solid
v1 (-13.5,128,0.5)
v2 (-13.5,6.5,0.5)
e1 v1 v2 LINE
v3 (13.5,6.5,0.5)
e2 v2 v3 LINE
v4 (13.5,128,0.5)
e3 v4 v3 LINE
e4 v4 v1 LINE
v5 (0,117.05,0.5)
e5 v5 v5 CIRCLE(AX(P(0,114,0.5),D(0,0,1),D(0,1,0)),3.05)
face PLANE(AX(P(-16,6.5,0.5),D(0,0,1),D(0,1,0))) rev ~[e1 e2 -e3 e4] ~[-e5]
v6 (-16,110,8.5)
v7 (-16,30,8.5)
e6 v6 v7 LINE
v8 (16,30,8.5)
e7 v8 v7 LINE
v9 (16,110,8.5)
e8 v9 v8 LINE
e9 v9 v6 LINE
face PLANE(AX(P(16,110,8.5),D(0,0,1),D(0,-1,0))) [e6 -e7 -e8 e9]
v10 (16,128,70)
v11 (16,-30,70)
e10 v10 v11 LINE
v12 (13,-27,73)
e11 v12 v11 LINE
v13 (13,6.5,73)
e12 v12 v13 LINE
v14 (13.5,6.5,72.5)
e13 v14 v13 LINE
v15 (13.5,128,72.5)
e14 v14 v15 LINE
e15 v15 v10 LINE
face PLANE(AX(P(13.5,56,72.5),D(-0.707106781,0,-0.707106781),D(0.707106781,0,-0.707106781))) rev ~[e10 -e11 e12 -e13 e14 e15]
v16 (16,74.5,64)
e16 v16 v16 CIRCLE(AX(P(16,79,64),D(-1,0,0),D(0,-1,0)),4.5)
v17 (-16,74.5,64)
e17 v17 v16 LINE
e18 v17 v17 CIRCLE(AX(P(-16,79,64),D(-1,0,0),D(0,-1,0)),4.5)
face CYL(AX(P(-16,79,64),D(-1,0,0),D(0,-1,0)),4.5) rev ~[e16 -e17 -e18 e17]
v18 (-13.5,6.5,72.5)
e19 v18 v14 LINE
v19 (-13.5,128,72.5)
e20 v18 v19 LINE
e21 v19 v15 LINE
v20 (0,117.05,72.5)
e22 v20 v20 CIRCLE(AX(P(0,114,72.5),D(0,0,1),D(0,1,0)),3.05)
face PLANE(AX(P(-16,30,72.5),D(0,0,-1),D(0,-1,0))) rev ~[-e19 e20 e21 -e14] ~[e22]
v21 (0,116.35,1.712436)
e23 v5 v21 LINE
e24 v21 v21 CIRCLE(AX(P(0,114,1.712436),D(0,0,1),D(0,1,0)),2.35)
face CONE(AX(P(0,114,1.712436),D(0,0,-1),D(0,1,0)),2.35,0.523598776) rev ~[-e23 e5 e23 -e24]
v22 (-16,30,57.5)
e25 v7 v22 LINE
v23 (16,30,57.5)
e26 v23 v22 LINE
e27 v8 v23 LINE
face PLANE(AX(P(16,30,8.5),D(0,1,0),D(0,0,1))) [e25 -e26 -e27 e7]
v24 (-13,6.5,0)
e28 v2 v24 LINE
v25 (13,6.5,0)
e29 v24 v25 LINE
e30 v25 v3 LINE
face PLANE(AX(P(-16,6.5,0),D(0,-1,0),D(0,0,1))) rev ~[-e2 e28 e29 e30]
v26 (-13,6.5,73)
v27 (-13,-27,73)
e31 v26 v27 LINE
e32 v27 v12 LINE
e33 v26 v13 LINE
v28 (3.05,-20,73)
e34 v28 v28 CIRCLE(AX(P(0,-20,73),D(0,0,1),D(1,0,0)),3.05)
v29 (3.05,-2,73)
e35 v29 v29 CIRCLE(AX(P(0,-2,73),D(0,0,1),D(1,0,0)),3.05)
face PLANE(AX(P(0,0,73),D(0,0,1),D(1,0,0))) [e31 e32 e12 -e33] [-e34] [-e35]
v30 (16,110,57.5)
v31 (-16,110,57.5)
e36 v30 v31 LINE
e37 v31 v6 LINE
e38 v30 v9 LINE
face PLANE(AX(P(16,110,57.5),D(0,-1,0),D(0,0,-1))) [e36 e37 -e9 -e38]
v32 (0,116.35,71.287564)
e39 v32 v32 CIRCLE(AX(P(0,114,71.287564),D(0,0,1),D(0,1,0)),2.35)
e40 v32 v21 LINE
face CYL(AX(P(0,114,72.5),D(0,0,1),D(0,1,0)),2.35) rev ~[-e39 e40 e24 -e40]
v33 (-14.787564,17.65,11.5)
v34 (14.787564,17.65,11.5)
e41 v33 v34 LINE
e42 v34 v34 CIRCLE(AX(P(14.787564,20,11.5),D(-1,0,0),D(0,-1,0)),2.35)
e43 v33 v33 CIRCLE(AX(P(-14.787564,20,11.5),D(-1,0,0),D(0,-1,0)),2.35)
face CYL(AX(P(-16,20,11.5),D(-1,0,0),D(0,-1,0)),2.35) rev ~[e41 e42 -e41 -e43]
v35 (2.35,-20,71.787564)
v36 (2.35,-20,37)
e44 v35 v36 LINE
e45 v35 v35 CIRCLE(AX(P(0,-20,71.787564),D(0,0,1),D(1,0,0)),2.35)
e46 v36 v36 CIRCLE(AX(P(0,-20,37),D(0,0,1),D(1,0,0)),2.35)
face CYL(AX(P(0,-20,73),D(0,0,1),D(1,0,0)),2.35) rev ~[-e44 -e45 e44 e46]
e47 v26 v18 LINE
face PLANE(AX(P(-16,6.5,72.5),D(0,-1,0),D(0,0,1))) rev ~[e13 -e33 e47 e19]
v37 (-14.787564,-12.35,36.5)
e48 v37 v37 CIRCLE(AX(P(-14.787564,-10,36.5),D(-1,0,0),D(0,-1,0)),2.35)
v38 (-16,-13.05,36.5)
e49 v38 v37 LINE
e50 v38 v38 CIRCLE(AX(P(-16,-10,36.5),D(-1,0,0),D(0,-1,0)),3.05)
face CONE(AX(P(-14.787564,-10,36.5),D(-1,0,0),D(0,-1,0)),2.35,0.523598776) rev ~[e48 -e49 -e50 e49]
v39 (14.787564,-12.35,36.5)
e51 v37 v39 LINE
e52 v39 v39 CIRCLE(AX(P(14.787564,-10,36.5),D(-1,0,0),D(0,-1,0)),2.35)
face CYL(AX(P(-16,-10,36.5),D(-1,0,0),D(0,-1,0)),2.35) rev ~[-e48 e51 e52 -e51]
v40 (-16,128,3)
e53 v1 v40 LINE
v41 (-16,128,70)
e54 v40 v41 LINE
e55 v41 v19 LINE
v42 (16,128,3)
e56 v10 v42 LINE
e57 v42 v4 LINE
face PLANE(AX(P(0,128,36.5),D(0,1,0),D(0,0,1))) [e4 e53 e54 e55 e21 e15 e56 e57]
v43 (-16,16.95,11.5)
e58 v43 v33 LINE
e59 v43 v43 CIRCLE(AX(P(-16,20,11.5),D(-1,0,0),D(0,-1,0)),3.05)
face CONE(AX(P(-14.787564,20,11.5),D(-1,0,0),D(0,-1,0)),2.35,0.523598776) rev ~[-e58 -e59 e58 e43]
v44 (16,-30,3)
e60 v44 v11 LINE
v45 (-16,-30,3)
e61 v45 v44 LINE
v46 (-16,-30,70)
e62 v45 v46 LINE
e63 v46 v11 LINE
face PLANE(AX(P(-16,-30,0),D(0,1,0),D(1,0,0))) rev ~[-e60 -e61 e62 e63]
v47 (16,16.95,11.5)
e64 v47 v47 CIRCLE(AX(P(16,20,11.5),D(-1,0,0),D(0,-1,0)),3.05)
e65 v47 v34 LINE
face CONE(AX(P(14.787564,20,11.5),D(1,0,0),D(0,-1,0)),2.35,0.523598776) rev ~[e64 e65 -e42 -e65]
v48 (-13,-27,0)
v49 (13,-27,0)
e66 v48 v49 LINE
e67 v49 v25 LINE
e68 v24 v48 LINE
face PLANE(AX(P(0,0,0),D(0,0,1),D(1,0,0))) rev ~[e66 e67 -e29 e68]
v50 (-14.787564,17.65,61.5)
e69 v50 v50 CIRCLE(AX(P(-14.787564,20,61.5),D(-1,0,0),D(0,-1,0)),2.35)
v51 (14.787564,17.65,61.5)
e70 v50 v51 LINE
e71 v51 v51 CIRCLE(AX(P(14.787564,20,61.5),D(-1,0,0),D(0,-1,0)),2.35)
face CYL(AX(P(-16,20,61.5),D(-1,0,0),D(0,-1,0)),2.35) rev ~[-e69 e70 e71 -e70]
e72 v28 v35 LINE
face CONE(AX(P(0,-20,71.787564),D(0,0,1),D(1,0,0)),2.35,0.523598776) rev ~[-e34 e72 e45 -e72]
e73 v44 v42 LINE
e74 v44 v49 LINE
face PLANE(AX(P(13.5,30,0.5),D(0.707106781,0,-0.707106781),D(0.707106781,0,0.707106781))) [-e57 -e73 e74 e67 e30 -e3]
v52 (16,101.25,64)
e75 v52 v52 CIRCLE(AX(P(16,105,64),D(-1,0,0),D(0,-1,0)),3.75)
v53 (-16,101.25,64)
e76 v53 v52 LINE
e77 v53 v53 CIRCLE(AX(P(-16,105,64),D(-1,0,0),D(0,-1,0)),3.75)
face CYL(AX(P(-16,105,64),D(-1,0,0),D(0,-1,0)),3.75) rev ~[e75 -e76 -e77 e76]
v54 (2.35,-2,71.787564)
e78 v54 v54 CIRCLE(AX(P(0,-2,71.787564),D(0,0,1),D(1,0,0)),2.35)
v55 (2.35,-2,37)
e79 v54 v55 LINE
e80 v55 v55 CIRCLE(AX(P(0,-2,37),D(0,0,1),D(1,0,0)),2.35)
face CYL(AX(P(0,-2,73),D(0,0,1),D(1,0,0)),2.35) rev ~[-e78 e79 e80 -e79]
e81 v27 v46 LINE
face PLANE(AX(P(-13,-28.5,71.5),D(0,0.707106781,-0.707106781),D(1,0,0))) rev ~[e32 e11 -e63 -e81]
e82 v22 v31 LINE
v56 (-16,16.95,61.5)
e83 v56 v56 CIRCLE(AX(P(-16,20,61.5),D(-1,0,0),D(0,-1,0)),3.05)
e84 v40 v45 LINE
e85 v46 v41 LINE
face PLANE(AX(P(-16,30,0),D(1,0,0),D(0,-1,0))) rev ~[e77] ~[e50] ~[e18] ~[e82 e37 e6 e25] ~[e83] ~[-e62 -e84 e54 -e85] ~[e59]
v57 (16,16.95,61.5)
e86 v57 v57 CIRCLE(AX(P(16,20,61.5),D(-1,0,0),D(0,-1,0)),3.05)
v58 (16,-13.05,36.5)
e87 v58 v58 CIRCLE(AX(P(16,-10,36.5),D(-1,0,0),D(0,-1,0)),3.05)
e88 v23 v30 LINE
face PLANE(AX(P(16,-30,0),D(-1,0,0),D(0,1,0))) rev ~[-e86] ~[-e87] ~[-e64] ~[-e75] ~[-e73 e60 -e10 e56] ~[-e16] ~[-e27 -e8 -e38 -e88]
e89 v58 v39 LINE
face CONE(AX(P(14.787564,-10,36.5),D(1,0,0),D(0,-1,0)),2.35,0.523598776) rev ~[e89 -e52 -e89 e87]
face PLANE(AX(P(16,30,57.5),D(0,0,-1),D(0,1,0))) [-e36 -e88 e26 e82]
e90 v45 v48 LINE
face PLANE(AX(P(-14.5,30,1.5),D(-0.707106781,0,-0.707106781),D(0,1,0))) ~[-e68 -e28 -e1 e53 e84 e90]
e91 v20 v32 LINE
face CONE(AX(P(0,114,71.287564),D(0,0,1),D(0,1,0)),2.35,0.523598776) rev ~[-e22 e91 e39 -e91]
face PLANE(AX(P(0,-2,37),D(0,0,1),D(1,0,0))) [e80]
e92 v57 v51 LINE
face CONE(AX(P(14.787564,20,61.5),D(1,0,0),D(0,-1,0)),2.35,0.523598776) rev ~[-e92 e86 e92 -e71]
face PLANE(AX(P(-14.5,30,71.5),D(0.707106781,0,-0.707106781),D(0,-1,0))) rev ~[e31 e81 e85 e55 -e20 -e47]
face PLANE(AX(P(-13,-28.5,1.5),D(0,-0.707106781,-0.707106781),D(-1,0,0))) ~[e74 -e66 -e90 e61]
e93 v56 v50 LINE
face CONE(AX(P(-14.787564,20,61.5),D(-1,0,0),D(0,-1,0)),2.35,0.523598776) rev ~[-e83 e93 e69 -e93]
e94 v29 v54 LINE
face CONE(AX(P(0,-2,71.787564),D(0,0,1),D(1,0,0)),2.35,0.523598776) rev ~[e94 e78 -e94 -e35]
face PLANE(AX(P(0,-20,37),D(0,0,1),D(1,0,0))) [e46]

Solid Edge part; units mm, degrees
sketch "Sketch1" plane through (0, 0, 0) normal (0, 0, 1) x (1, 0, 0)
  line L0 (-16, -30) -> (16, -30)
  line L1 (16, -30) -> (16, 30)
  line L2 (16, 30) -> (-16, 30)
  line L3 (-16, 30) -> (-16, -30)
  dimension "D1" = 32
  dimension "D2" = 60
extrude "Protrusion1" add sketch "Sketch1" along normal blind 73
sketch "Sketch2" plane through (0, 0, 73) normal (0, 0, 1) x (1, 0, 0)
  circle A0 centre (0, -20) radius 2.35
  circle A1 centre (0, -2) radius 2.35
  dimension "D1" = 4.7
  dimension "D2" = 18
  dimension "D3" = 10
extrude "Extrusionsausschnitt_1" cut sketch "Sketch2" against normal blind 36
chamfer "Fase_3" distance 0.7 angle 60 2 edges at (-2.35, -2, 73) (-2.35, -20, 73) measured on face at (-10.9867, -19.4, 73)
chamfer "Fase_6" distance 3 angle 45 4 edges at (-16, 0, 73) (-16, 0, 0) (16, 0, 73) (16, 0, 0)
chamfer "Fase_7" distance 3 angle 45 2 edges at (0, -30, 73) (0, -30, 0)
sketch "Sketch3" plane through (-16, 0, 36.5) normal (-1, 0, 0) x (0, -1, 0)
  circle A0 centre (-20, 25) radius 2.35
  circle A1 centre (-20, -25) radius 2.35
  circle A2 centre (10, 0) radius 2.35
  dimension "D1" = 4.7
  dimension "D2" = 50
  dimension "D3" = 10
  dimension "D4" = 30
extrude "Cutout1" cut sketch "Sketch3" against normal through all
chamfer "Fase_9" distance 0.7 angle 60 6 edges at (-16, 22.35, 61.5) (-16, -7.65, 36.5) (-16, 22.35, 11.5) (16, 20, 59.15) (16, 20, 9.15) (16, -10, 34.15) measured on face at (-16, 20.6, 58.1633) measured on face at (16, -20.6, 58.1633)
sketch "Sketch4" plane through (-16, 0, 36.5) normal (-1, 0, 0) x (0, -1, 0)
  line L0 (-6.5, 36.5) -> (-30, 36.5)
  line L1 (-30, 36.5) -> (-30, 36)
  line L2 (-30, 36) -> (-6.5, 36)
  line L3 (-6.5, 36) -> (-6.5, 36.5)
  line L4 (-30, -36.5) -> (-6.5, -36.5)
  line L5 (-6.5, -36.5) -> (-6.5, -36)
  line L6 (-6.5, -36) -> (-30, -36)
  line L7 (-30, -36) -> (-30, -36.5)
  dimension "D1" = 0.5
  dimension "D2" = 36.5
  dimension "D3" = 0.5
  dimension "D4" = 36.5
extrude "Cutout2" cut sketch "Sketch4" against normal through all
sketch "Sketch5" plane through (0, 30, 36.5) normal (0, 1, 0) x (1, 0, 0)
  line L0 (-16, 33.5) -> (-13.5, 36)
  line L1 (-13.5, 36) -> (13.5, 36)
  line L2 (13.5, 36) -> (16, 33.5)
  line L3 (16, 33.5) -> (16, -33.5)
  line L4 (16, -33.5) -> (13.5, -36)
  line L5 (13.5, -36) -> (-13.5, -36)
  line L6 (-13.5, -36) -> (-16, -33.5)
  line L7 (-16, -33.5) -> (-16, 33.5)
extrude "Extrusionsausprägung_2" add sketch "Sketch5" along normal blind 26
sketch "Sketch6" plane through (0, 56, 36.5) normal (0, 1, 0) x (-1, 0, 0)
  line L0 (-13.5, 36) -> (-16, 33.5)
  line L1 (-16, 33.5) -> (-16, -33.5)
  line L2 (-16, -33.5) -> (-13.5, -36)
  line L3 (-13.5, -36) -> (13.5, -36)
  line L4 (13.5, -36) -> (16, -33.5)
  line L5 (16, -33.5) -> (16, 33.5)
  line L6 (16, 33.5) -> (13.5, 36)
  line L7 (13.5, 36) -> (-13.5, 36)
extrude "Extrusionsausprägung_3" add sketch "Sketch6" along normal blind 72
sketch "Sketch7" plane through (16, 47, 36.5) normal (1, 0, 0) x (0, 1, 0)
  line L0 (-17, 21) -> (63, 21)
  line L1 (63, 21) -> (63, -28)
  line L2 (63, -28) -> (-17, -28)
  line L3 (-17, -28) -> (-17, 21)
  dimension "D1" = 10
  dimension "D2" = 80
  dimension "D3" = 15
  dimension "D4" = 8
extrude "Cutout3" cut sketch "Sketch7" against normal through all
sketch "Sketch8" plane through (0, 65.25, 72.5) normal (0, 0, 1) x (0, 1, 0)
  circle A0 centre (48.75, 0) radius 2.35
  dimension "D1" = 4.7
  dimension "D2" = 14
extrude "Cutout4" cut sketch "Sketch8" against normal through all
chamfer "Fase_11" distance 0.7 angle 60 2 edges at (-2.35, 114, 0.5) (0, 111.65, 72.5) measured on face at (8.73, 108.965, 72.5) measured on face at (8.73, 25.535, 0.5)
sketch "Sketch9" plane through (-16, 49, 36.5) normal (-1, 0, 0) x (0, -1, 0)
  circle A0 centre (-56, 27.5) radius 3.75
  dimension "D1" = 9
  dimension "D2" = 7.5
  dimension "D3" = 8.5
extrude "Cutout5" cut sketch "Sketch9" against normal through all
sketch "Sketch10" plane through (-16, 49, 36.5) normal (-1, 0, 0) x (0, -1, 0)
  circle A0 centre (-30, 27.5) radius 4.5
  dimension "D1" = 9
  dimension "D2" = 26
extrude "Cutout6" cut sketch "Sketch10" against normal through all
properties material "Nylon, allgemein"
